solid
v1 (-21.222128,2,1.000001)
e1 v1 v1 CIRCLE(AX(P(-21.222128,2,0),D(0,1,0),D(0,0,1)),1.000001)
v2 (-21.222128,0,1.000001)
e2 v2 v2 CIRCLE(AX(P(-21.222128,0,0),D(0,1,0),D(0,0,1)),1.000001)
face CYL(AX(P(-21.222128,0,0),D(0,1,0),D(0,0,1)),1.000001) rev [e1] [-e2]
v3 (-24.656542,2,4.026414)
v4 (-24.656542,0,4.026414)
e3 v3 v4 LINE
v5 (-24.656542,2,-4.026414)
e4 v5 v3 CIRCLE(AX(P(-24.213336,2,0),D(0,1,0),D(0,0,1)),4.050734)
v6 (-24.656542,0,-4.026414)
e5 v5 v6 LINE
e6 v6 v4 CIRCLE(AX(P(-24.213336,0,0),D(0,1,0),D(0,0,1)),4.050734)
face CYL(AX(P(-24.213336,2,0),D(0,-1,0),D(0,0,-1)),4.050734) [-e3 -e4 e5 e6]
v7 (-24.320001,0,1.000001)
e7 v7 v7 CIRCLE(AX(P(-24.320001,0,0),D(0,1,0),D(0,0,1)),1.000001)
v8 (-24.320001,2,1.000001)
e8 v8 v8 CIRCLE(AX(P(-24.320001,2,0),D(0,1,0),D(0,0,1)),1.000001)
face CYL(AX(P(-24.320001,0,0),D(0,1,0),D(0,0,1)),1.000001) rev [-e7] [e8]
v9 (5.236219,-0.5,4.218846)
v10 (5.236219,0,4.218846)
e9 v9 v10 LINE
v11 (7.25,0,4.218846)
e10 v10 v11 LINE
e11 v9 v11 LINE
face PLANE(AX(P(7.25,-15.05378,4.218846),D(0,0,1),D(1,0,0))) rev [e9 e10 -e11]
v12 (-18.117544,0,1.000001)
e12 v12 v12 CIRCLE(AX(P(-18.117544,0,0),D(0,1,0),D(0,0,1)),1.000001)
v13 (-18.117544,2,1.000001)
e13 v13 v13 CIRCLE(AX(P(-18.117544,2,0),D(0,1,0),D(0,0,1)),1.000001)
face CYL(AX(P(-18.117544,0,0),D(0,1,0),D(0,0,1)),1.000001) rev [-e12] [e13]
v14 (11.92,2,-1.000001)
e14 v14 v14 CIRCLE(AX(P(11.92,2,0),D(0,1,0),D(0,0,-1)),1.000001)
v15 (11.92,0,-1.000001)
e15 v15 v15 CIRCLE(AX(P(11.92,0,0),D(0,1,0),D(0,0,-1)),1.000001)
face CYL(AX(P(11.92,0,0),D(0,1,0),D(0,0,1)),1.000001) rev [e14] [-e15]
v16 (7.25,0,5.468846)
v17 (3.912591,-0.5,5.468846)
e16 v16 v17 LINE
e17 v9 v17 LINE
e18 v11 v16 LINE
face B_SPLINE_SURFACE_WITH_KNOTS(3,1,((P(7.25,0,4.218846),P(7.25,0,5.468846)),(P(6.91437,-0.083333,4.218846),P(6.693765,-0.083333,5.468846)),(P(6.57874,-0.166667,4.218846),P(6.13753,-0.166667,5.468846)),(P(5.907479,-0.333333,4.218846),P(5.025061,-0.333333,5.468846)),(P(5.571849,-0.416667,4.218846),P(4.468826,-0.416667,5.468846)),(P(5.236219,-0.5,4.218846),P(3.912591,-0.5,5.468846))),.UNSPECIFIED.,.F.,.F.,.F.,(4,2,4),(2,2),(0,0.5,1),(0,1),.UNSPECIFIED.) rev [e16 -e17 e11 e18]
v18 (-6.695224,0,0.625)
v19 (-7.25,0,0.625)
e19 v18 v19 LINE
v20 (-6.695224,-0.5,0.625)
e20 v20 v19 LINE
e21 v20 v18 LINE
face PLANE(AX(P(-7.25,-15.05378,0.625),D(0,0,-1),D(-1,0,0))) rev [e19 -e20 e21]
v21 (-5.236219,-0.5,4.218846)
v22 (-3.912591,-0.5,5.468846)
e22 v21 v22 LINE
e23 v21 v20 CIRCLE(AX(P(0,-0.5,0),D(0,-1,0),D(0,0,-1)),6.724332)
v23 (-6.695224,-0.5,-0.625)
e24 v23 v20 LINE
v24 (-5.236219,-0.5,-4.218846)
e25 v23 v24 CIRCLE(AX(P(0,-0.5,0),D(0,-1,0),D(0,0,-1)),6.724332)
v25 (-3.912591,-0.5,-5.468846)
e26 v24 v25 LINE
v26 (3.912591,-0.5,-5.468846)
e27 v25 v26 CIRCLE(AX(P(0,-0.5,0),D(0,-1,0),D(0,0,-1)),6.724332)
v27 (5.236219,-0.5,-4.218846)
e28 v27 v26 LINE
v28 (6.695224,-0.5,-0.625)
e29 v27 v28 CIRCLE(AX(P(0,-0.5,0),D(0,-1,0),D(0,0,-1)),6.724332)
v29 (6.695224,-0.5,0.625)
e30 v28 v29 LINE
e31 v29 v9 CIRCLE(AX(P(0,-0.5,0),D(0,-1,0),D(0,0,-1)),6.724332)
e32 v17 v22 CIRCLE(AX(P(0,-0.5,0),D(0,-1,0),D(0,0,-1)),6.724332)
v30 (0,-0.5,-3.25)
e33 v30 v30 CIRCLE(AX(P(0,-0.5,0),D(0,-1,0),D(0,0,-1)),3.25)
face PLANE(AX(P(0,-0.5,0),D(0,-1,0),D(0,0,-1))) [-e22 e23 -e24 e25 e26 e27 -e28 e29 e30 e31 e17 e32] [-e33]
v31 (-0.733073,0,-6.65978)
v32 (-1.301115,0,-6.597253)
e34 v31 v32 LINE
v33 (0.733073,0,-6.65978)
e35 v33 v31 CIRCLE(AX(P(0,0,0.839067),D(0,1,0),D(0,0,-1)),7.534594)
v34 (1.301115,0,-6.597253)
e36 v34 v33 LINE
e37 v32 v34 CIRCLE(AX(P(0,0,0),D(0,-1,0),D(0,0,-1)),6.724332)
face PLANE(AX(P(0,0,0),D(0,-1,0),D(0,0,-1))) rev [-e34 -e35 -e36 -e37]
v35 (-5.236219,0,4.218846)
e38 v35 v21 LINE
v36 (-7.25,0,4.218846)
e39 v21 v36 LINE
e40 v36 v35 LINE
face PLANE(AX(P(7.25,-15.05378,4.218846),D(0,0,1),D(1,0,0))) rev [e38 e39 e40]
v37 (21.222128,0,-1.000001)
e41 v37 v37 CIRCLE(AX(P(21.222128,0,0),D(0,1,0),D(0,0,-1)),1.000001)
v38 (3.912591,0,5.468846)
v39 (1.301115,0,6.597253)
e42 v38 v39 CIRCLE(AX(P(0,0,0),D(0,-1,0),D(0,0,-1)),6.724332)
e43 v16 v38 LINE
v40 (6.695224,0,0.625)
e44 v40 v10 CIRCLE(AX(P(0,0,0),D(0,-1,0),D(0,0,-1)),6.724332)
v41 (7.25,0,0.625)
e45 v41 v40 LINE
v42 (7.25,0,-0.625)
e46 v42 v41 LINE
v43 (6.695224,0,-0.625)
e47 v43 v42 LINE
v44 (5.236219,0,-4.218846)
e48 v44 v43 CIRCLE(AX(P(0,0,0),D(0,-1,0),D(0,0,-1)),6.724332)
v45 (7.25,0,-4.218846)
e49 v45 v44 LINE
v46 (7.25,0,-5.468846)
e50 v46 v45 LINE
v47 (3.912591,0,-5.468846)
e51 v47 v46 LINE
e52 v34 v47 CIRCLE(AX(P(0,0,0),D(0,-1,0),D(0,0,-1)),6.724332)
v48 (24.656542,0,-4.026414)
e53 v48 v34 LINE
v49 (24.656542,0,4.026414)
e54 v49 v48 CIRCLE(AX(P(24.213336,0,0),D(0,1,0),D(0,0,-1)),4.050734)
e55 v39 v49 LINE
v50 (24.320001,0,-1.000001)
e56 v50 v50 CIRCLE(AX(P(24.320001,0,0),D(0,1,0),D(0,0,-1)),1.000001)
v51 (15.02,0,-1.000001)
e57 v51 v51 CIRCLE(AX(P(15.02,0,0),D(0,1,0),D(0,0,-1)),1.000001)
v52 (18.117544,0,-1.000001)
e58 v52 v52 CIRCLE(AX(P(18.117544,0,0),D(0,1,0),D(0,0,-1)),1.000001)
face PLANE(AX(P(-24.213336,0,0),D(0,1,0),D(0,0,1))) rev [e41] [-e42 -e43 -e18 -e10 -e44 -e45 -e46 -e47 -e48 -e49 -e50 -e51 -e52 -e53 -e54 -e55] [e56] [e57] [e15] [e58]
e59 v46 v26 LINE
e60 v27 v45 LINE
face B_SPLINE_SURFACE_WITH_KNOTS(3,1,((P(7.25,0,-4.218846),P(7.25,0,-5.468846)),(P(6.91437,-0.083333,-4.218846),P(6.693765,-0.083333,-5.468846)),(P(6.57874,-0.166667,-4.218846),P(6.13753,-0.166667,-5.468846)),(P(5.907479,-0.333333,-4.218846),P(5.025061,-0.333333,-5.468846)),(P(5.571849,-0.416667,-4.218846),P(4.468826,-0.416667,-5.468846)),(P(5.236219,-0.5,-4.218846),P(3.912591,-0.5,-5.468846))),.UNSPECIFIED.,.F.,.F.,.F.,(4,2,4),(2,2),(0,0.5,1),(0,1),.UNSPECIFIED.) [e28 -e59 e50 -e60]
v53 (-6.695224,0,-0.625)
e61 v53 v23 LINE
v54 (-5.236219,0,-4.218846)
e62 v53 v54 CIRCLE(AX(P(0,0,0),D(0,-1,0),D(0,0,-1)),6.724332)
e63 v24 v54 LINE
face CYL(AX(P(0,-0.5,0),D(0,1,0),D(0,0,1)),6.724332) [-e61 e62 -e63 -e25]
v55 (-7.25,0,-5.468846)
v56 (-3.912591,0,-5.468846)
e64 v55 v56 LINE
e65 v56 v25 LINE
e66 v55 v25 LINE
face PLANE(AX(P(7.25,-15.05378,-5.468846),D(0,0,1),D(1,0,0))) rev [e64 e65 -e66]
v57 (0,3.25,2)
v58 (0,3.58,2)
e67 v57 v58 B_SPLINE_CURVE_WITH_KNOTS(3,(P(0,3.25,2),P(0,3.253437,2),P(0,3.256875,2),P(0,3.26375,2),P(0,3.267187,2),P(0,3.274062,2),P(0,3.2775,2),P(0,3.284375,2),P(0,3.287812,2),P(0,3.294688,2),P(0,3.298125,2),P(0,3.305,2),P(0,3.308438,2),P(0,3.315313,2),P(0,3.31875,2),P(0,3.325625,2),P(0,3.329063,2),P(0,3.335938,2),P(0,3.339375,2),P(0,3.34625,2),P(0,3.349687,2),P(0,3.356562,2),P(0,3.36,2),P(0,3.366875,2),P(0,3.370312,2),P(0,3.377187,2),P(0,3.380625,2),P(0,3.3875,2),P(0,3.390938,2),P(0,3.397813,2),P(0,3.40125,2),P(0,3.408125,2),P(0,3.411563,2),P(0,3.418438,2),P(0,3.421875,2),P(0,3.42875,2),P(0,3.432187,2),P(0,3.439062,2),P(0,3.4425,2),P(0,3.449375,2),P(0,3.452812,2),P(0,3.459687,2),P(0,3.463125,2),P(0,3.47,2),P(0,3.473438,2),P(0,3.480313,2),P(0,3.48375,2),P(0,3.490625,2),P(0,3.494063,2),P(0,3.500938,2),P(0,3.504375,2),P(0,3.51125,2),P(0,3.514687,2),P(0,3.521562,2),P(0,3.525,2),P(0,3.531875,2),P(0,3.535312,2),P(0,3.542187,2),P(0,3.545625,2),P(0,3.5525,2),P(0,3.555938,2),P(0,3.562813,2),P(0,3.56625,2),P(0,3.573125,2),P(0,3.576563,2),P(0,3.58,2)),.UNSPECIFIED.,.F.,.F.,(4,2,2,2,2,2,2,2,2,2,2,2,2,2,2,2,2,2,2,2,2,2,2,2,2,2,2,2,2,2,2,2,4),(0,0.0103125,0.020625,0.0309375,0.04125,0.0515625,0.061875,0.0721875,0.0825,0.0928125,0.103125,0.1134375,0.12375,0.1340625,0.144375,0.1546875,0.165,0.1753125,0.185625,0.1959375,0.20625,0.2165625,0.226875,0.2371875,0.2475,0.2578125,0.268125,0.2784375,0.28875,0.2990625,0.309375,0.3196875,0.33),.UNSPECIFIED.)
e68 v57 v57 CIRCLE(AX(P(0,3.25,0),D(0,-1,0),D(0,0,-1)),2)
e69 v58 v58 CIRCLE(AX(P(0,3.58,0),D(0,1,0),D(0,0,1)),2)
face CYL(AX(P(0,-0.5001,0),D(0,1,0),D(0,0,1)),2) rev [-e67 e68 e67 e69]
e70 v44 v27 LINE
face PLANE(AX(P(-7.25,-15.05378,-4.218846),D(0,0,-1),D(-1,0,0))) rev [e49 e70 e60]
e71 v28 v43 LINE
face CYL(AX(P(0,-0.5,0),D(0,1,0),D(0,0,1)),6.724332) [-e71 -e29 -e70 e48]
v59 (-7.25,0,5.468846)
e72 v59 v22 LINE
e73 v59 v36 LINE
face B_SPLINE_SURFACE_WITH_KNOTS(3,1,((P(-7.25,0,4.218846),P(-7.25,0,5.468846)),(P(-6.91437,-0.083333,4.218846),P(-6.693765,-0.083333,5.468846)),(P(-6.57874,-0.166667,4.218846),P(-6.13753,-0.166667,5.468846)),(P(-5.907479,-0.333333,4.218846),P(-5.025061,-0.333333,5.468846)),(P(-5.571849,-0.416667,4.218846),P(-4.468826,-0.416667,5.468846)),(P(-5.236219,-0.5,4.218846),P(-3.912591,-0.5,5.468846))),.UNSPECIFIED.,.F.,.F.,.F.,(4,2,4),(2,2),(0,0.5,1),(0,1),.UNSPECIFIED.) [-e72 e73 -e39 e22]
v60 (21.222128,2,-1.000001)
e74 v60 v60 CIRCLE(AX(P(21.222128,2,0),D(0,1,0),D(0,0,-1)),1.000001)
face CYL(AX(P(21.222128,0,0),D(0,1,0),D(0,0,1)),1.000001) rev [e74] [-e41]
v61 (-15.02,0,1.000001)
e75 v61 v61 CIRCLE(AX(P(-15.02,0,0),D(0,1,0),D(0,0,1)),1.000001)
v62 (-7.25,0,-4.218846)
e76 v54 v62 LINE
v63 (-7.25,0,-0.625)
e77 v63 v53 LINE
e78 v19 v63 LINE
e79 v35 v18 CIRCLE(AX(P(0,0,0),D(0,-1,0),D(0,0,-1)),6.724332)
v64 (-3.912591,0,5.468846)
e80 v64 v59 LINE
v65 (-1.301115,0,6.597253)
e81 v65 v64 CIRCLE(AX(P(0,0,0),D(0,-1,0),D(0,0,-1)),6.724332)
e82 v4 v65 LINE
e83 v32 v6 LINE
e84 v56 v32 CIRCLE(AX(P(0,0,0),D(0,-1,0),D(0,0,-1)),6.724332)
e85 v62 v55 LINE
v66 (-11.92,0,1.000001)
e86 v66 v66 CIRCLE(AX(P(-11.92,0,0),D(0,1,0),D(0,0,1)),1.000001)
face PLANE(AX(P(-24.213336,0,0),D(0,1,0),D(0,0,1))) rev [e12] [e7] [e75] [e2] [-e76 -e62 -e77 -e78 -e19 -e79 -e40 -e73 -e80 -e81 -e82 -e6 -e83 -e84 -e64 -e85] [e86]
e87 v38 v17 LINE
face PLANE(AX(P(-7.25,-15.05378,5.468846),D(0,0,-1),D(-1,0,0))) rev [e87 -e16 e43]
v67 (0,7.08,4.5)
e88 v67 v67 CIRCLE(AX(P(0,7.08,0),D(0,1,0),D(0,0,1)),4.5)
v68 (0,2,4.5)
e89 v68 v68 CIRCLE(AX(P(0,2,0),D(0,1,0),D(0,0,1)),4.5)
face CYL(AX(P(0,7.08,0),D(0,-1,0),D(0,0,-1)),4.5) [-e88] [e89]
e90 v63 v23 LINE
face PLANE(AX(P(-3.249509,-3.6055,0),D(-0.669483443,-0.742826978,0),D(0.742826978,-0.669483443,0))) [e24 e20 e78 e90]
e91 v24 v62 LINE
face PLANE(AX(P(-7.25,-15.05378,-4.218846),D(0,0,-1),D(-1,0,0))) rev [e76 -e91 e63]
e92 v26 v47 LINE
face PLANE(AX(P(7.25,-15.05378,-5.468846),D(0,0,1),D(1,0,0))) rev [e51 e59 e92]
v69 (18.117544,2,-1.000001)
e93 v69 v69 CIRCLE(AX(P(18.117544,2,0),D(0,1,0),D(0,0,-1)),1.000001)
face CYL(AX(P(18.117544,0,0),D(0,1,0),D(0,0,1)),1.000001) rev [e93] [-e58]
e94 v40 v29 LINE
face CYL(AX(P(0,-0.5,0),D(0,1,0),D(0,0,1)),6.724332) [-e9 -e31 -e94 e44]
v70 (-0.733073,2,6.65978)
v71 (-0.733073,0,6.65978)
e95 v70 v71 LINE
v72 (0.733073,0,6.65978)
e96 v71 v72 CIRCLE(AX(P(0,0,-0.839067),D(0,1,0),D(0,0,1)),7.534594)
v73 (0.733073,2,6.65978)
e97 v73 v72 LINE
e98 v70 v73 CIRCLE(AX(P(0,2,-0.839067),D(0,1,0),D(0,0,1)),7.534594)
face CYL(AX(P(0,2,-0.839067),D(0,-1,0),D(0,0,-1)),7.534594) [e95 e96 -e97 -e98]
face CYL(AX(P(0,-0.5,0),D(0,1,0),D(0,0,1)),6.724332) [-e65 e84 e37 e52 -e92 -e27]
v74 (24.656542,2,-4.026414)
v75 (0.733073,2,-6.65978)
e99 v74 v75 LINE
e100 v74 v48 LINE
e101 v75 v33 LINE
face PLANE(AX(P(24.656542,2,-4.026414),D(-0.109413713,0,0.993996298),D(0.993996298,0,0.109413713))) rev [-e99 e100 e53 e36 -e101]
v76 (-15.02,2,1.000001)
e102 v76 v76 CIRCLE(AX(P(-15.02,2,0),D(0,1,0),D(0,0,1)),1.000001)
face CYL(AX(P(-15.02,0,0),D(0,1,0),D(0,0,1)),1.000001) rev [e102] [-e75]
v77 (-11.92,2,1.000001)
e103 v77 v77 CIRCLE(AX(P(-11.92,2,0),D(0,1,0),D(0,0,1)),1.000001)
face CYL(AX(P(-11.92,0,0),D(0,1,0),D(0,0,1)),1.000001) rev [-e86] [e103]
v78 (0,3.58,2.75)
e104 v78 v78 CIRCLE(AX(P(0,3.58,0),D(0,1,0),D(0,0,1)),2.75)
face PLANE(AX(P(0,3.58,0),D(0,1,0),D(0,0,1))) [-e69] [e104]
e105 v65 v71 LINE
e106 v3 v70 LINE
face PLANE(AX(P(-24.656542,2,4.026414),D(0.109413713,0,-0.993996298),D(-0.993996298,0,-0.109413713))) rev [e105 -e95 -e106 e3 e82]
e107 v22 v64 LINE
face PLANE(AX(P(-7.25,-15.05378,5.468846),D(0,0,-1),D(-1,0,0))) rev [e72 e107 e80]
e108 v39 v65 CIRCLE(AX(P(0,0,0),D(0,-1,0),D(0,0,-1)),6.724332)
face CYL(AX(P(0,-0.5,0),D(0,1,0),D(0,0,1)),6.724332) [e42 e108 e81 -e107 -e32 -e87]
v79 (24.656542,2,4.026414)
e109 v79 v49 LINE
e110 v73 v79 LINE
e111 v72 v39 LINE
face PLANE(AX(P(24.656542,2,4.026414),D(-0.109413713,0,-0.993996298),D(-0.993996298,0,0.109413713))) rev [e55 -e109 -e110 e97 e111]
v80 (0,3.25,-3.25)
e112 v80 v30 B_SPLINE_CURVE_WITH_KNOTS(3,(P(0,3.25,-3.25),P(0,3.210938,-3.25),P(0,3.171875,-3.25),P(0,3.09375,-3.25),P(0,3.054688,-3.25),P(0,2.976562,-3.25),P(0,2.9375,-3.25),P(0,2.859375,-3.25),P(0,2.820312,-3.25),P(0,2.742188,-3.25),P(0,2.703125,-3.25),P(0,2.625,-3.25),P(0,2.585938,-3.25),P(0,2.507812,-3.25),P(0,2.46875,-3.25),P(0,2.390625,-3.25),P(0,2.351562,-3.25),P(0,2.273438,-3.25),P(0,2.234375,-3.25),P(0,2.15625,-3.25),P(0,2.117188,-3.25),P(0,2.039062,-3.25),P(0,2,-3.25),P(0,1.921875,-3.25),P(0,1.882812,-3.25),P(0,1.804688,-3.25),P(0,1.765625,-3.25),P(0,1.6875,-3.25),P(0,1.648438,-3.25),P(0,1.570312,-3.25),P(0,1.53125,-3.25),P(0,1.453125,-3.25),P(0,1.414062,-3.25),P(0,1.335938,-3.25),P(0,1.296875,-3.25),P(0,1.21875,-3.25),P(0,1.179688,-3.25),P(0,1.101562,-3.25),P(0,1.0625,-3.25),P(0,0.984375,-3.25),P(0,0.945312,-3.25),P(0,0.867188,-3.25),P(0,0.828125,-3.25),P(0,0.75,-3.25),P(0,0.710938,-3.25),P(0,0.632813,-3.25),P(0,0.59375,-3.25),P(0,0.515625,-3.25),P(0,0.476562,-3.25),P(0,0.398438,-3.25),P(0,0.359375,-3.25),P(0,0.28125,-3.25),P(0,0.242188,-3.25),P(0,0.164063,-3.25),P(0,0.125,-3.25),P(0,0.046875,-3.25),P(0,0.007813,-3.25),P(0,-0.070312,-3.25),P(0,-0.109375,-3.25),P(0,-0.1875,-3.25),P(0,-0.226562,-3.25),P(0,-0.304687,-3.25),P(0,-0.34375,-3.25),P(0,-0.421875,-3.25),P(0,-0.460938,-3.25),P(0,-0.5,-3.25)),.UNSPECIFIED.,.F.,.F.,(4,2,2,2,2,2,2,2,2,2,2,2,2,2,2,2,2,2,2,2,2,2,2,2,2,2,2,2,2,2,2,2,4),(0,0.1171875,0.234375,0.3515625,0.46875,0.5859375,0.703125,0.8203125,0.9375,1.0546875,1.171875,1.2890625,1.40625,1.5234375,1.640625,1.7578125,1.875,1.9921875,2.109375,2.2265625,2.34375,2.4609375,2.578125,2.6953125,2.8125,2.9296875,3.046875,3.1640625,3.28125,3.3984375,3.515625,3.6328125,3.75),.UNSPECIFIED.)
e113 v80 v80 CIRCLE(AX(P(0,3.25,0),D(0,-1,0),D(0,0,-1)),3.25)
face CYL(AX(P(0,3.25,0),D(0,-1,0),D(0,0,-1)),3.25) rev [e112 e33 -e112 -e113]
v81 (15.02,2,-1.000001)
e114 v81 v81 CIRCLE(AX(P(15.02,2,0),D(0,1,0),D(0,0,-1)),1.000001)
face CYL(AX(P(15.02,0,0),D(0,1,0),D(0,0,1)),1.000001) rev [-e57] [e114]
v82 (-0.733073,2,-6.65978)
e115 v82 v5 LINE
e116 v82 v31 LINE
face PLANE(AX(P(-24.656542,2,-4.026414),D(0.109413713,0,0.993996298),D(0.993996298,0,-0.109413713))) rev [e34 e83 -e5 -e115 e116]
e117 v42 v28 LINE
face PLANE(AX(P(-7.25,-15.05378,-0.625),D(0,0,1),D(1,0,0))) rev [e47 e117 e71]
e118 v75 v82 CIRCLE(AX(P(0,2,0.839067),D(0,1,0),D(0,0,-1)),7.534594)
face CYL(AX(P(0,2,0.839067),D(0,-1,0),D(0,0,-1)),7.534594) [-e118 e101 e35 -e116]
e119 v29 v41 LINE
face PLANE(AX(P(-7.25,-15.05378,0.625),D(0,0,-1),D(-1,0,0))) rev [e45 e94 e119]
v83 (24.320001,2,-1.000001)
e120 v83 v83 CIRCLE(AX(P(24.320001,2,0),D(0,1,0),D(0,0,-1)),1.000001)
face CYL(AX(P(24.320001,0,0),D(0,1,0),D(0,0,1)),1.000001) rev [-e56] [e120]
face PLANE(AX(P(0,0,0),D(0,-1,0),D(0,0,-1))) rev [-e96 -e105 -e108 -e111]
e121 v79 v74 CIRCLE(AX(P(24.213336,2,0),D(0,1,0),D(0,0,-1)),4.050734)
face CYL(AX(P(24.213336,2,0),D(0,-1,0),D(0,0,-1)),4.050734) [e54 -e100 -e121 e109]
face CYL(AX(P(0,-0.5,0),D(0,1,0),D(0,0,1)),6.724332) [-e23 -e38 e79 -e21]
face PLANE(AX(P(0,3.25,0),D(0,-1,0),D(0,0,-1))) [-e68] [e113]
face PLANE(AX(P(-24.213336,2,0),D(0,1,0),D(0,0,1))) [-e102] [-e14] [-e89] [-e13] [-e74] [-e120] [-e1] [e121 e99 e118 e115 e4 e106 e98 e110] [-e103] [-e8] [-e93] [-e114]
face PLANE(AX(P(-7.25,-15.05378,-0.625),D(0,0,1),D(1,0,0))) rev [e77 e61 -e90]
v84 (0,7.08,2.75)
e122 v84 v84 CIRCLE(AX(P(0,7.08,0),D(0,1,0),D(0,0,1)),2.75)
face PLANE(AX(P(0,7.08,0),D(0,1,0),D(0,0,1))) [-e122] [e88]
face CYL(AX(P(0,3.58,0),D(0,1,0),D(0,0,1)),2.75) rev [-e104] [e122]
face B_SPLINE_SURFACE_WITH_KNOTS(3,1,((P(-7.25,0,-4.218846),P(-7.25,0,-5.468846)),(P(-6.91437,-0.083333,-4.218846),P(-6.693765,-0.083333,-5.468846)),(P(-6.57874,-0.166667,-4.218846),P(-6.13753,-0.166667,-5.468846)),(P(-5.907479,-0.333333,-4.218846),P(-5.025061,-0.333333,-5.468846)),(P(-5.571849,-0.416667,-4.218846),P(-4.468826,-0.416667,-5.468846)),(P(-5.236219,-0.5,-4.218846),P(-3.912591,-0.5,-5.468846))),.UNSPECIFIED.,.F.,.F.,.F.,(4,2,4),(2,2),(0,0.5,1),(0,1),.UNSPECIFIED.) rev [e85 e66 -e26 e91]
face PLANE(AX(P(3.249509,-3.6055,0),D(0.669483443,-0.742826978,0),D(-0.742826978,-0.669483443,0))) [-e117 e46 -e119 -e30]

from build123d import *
from build123d.topology import SkipClean

# Parameters (mm, degrees)
BOSS_EXTRUDE1_DEPTH = 2
SKETCH2_R           = 1.000000794
CUT_EXTRUDE1_DEPTH  = 2
SKETCH3_R           = 4.5
BOSS_EXTRUDE2_DEPTH = 5.08
SKETCH4_R           = 2.75
CUT_EXTRUDE2_DEPTH  = 3.5
SKETCH5_R           = 3.25
CUT_EXTRUDE3_DEPTH  = 3.25
SKETCH7_R           = 6.724332425
BOSS_EXTRUDE3_DEPTH = 0.5
SKETCH8_W           = 14.5
SKETCH8_H           = 1.25
SKETCH8_H_2         = 1.25000004
BOSS_EXTRUDE4_DEPTH = 0.5
SKETCH6_R           = 2
CUT_EXTRUDE4_DEPTH  = 30.338041851
SKETCH15_R          = 3.25
CUT_EXTRUDE5_DEPTH  = 3.75


# Read off the part's stored shape, not the designer's step: Mirror3
with BuildPart() as part:
    # Sketch1 → Boss-Extrude1 (new body)
    with BuildSketch(Plane(origin=(0, 0, 0), x_dir=(1, 0, 0), z_dir=(0, 1, 0))):
        with BuildLine():
            Line((-24.656541995, 4.026414392), (-0.733072501, 6.659779954))
            ThreePointArc((-0.733072501, 6.659779954), (0, 6.695526614), (0.733072501, 6.659779954))
            Line((0.733072501, 6.659779954), (24.656541995, 4.026414392))
            ThreePointArc((24.656541995, 4.026414392), (28.264069964, 0), (24.656541995, -4.026414392))
            Line((24.656541995, -4.026414392), (0.733072501, -6.659779954))
            ThreePointArc((0.733072501, -6.659779954), (0, -6.695526614), (-0.733072501, -6.659779954))
            Line((-0.733072501, -6.659779954), (-24.656541995, -4.026414392))
            ThreePointArc((-24.656541995, -4.026414392), (-28.264069964, 0), (-24.656541995, 4.026414392))
        make_face()
    extrude(amount=BOSS_EXTRUDE1_DEPTH)

    # Sketch2 → Cut-Extrude1 (cut)
    with BuildSketch(Plane(origin=(0, 2, 0), x_dir=(1, 0, 0), z_dir=(0, 1, 0))):
        with Locations(Location((-24.320001144, 0, 0), (0, 0, 270))):
            Circle(SKETCH2_R)
        with Locations(Location((-21.222128244, 0, 0), (0, 0, 270))):
            Circle(SKETCH2_R)
        with Locations(Location((-18.117543648, 0, 0), (0, 0, 270))):
            Circle(SKETCH2_R)
        with Locations(Location((-15.019999932, 0, 0), (0, 0, 270))):
            Circle(SKETCH2_R)
        with Locations(Location((-11.919999782, 0, 0), (0, 0, 270))):
            Circle(SKETCH2_R)
        with Locations(Location((24.320001144, 0, 0), (0, 0, 90))):
            Circle(SKETCH2_R)
        with Locations(Location((21.222128244, 0, 0), (0, 0, 90))):
            Circle(SKETCH2_R)
        with Locations(Location((18.117543648, 0, 0), (0, 0, 90))):
            Circle(SKETCH2_R)
        with Locations(Location((15.019999932, 0, 0), (0, 0, 90))):
            Circle(SKETCH2_R)
        with Locations(Location((11.919999782, 0, 0), (0, 0, 90))):
            Circle(SKETCH2_R)
    extrude(amount=-CUT_EXTRUDE1_DEPTH, mode=Mode.SUBTRACT)

    # Sketch3 → Boss-Extrude2 (add)
    with BuildSketch(Plane(origin=(0, 2, 0), x_dir=(1, 0, 0), z_dir=(0, 1, 0))):
        with Locations(Location((0, 0, 0), (0, 0, 270))):
            Circle(SKETCH3_R)
    extrude(amount=BOSS_EXTRUDE2_DEPTH)

    # Sketch4 → Cut-Extrude2 (cut)
    with BuildSketch(Plane(origin=(0, 7.08, 0), x_dir=(1, 0, 0), z_dir=(0, 1, 0))):
        with Locations(Location((0, 0, 0), (0, 0, 270))):
            Circle(SKETCH4_R)
    extrude(amount=-CUT_EXTRUDE2_DEPTH, mode=Mode.SUBTRACT)

    # Sketch5 → Cut-Extrude3 (cut)
    with BuildSketch(Plane.XZ):
        with Locations(Location((0, 0, 0), (0, 0, 270))):
            Circle(SKETCH5_R)
    extrude(amount=-CUT_EXTRUDE3_DEPTH, mode=Mode.SUBTRACT)

    # Sketch7 → Boss-Extrude3 (add)
    with BuildSketch(Plane.XZ):
        with Locations(Location((0, 0, 0), (0, 0, 78.843263662))):
            Circle(SKETCH7_R)
    extrude(amount=BOSS_EXTRUDE3_DEPTH)

    # Sketch8 → Boss-Extrude4 (add)
    with BuildSketch(Plane.XZ):
        Rectangle(SKETCH8_W, SKETCH8_H)
        with Locations((0, -4.843845819)):
            Rectangle(SKETCH8_W, SKETCH8_H_2)
        with Locations((0, 4.843845819)):
            Rectangle(SKETCH8_W, SKETCH8_H_2)
    extrude(amount=BOSS_EXTRUDE4_DEPTH)

    # Sketch13 → Cut-Loft1 section 0
    with BuildSketch(Plane.XY.offset(-4.218845799)):
        with BuildLine():
            Line((-7.25, 0), (-5.236218739, -0.5))
            Line((-5.236218739, -0.5), (-7.25, -0.5))
            Line((-7.25, -0.5), (-7.25, 0))
        make_face()
    # Sketch12 → Cut-Loft1 section 1
    with BuildSketch(Plane(origin=(0, 0, -5.468845839), x_dir=(-1, 0, 0), z_dir=(0, 0, -1))):
        with BuildLine():
            Line((3.912591436, -0.5), (7.25, -0.5))
            Line((7.25, -0.5), (7.25, 0))
            Line((7.25, 0), (3.912591436, -0.5))
        make_face()
    cut_loft1 = loft(mode=Mode.SUBTRACT)

    # Mirror1: Cut-Loft1 across plane
    add(cut_loft1.mirror(Plane.XY), mode=Mode.SUBTRACT)

    # Mirror2: Cut-Loft1 across plane
    add(cut_loft1.mirror(Plane(origin=(0, 0, 0), x_dir=(0, 0, 1), z_dir=(1, 0, 0))), mode=Mode.SUBTRACT)

    # Mirror3
    split(bisect_by=Plane.XY, keep=Keep.BOTTOM)

    # Mirror3 2: part across plane


with BuildPart() as part_1:
    with SkipClean():  # the faces are left unmerged after this step: merging them gives an invalid solid
        add(part.part)
        add(part.part.mirror(Plane.XY))

    # Sketch10 → Cut-Loft2 section 0
    with SkipClean():  # the faces are left unmerged after this step: merging them gives an invalid solid
        with BuildSketch(Plane(origin=(0, 0, -0.625), x_dir=(-1, 0, 0), z_dir=(0, 0, -1))):
            with BuildLine():
                Line((7.25, -0.5), (6.695223787, -0.5))
                Line((6.695223787, -0.5), (7.25, 0))
                Line((7.25, 0), (7.25, -0.5))
            make_face()
        # Sketch14 → Cut-Loft2 section 1
        with BuildSketch(Plane.XY.offset(0.625)):
            with BuildLine():
                Line((-7.25, 0), (-6.695223787, -0.5))
                Line((-6.695223787, -0.5), (-7.25, -0.5))
                Line((-7.25, -0.5), (-7.25, 0))
            make_face()
        cut_loft2 = loft(mode=Mode.SUBTRACT)

    # Mirror5: Cut-Loft2 across plane
    with SkipClean():  # the faces are left unmerged after this step: merging them gives an invalid solid
        add(cut_loft2.mirror(Plane(origin=(0, 0, 0), x_dir=(0, 0, 1), z_dir=(1, 0, 0))), mode=Mode.SUBTRACT)

    # Sketch6 → Cut-Extrude4 (cut, through all)
    with SkipClean():  # the faces are left unmerged after this step: merging them gives an invalid solid
        with BuildSketch(Plane(origin=(0, 3.58, 0), x_dir=(1, 0, 0), z_dir=(0, 1, 0))):
            with Locations(Location((0, 0, 0), (0, 0, 270))):
                Circle(SKETCH6_R)
        extrude(amount=-CUT_EXTRUDE4_DEPTH, mode=Mode.SUBTRACT)

    # Sketch15 → Cut-Extrude5 (cut)
    with SkipClean():  # the faces are left unmerged after this step: merging them gives an invalid solid
        with BuildSketch(Plane.XZ.offset(0.5)):
            with Locations(Location((0, 0, 0), (0, 0, 270))):
                Circle(SKETCH15_R)
        extrude(amount=-CUT_EXTRUDE5_DEPTH, mode=Mode.SUBTRACT)


solid = part_1.part
